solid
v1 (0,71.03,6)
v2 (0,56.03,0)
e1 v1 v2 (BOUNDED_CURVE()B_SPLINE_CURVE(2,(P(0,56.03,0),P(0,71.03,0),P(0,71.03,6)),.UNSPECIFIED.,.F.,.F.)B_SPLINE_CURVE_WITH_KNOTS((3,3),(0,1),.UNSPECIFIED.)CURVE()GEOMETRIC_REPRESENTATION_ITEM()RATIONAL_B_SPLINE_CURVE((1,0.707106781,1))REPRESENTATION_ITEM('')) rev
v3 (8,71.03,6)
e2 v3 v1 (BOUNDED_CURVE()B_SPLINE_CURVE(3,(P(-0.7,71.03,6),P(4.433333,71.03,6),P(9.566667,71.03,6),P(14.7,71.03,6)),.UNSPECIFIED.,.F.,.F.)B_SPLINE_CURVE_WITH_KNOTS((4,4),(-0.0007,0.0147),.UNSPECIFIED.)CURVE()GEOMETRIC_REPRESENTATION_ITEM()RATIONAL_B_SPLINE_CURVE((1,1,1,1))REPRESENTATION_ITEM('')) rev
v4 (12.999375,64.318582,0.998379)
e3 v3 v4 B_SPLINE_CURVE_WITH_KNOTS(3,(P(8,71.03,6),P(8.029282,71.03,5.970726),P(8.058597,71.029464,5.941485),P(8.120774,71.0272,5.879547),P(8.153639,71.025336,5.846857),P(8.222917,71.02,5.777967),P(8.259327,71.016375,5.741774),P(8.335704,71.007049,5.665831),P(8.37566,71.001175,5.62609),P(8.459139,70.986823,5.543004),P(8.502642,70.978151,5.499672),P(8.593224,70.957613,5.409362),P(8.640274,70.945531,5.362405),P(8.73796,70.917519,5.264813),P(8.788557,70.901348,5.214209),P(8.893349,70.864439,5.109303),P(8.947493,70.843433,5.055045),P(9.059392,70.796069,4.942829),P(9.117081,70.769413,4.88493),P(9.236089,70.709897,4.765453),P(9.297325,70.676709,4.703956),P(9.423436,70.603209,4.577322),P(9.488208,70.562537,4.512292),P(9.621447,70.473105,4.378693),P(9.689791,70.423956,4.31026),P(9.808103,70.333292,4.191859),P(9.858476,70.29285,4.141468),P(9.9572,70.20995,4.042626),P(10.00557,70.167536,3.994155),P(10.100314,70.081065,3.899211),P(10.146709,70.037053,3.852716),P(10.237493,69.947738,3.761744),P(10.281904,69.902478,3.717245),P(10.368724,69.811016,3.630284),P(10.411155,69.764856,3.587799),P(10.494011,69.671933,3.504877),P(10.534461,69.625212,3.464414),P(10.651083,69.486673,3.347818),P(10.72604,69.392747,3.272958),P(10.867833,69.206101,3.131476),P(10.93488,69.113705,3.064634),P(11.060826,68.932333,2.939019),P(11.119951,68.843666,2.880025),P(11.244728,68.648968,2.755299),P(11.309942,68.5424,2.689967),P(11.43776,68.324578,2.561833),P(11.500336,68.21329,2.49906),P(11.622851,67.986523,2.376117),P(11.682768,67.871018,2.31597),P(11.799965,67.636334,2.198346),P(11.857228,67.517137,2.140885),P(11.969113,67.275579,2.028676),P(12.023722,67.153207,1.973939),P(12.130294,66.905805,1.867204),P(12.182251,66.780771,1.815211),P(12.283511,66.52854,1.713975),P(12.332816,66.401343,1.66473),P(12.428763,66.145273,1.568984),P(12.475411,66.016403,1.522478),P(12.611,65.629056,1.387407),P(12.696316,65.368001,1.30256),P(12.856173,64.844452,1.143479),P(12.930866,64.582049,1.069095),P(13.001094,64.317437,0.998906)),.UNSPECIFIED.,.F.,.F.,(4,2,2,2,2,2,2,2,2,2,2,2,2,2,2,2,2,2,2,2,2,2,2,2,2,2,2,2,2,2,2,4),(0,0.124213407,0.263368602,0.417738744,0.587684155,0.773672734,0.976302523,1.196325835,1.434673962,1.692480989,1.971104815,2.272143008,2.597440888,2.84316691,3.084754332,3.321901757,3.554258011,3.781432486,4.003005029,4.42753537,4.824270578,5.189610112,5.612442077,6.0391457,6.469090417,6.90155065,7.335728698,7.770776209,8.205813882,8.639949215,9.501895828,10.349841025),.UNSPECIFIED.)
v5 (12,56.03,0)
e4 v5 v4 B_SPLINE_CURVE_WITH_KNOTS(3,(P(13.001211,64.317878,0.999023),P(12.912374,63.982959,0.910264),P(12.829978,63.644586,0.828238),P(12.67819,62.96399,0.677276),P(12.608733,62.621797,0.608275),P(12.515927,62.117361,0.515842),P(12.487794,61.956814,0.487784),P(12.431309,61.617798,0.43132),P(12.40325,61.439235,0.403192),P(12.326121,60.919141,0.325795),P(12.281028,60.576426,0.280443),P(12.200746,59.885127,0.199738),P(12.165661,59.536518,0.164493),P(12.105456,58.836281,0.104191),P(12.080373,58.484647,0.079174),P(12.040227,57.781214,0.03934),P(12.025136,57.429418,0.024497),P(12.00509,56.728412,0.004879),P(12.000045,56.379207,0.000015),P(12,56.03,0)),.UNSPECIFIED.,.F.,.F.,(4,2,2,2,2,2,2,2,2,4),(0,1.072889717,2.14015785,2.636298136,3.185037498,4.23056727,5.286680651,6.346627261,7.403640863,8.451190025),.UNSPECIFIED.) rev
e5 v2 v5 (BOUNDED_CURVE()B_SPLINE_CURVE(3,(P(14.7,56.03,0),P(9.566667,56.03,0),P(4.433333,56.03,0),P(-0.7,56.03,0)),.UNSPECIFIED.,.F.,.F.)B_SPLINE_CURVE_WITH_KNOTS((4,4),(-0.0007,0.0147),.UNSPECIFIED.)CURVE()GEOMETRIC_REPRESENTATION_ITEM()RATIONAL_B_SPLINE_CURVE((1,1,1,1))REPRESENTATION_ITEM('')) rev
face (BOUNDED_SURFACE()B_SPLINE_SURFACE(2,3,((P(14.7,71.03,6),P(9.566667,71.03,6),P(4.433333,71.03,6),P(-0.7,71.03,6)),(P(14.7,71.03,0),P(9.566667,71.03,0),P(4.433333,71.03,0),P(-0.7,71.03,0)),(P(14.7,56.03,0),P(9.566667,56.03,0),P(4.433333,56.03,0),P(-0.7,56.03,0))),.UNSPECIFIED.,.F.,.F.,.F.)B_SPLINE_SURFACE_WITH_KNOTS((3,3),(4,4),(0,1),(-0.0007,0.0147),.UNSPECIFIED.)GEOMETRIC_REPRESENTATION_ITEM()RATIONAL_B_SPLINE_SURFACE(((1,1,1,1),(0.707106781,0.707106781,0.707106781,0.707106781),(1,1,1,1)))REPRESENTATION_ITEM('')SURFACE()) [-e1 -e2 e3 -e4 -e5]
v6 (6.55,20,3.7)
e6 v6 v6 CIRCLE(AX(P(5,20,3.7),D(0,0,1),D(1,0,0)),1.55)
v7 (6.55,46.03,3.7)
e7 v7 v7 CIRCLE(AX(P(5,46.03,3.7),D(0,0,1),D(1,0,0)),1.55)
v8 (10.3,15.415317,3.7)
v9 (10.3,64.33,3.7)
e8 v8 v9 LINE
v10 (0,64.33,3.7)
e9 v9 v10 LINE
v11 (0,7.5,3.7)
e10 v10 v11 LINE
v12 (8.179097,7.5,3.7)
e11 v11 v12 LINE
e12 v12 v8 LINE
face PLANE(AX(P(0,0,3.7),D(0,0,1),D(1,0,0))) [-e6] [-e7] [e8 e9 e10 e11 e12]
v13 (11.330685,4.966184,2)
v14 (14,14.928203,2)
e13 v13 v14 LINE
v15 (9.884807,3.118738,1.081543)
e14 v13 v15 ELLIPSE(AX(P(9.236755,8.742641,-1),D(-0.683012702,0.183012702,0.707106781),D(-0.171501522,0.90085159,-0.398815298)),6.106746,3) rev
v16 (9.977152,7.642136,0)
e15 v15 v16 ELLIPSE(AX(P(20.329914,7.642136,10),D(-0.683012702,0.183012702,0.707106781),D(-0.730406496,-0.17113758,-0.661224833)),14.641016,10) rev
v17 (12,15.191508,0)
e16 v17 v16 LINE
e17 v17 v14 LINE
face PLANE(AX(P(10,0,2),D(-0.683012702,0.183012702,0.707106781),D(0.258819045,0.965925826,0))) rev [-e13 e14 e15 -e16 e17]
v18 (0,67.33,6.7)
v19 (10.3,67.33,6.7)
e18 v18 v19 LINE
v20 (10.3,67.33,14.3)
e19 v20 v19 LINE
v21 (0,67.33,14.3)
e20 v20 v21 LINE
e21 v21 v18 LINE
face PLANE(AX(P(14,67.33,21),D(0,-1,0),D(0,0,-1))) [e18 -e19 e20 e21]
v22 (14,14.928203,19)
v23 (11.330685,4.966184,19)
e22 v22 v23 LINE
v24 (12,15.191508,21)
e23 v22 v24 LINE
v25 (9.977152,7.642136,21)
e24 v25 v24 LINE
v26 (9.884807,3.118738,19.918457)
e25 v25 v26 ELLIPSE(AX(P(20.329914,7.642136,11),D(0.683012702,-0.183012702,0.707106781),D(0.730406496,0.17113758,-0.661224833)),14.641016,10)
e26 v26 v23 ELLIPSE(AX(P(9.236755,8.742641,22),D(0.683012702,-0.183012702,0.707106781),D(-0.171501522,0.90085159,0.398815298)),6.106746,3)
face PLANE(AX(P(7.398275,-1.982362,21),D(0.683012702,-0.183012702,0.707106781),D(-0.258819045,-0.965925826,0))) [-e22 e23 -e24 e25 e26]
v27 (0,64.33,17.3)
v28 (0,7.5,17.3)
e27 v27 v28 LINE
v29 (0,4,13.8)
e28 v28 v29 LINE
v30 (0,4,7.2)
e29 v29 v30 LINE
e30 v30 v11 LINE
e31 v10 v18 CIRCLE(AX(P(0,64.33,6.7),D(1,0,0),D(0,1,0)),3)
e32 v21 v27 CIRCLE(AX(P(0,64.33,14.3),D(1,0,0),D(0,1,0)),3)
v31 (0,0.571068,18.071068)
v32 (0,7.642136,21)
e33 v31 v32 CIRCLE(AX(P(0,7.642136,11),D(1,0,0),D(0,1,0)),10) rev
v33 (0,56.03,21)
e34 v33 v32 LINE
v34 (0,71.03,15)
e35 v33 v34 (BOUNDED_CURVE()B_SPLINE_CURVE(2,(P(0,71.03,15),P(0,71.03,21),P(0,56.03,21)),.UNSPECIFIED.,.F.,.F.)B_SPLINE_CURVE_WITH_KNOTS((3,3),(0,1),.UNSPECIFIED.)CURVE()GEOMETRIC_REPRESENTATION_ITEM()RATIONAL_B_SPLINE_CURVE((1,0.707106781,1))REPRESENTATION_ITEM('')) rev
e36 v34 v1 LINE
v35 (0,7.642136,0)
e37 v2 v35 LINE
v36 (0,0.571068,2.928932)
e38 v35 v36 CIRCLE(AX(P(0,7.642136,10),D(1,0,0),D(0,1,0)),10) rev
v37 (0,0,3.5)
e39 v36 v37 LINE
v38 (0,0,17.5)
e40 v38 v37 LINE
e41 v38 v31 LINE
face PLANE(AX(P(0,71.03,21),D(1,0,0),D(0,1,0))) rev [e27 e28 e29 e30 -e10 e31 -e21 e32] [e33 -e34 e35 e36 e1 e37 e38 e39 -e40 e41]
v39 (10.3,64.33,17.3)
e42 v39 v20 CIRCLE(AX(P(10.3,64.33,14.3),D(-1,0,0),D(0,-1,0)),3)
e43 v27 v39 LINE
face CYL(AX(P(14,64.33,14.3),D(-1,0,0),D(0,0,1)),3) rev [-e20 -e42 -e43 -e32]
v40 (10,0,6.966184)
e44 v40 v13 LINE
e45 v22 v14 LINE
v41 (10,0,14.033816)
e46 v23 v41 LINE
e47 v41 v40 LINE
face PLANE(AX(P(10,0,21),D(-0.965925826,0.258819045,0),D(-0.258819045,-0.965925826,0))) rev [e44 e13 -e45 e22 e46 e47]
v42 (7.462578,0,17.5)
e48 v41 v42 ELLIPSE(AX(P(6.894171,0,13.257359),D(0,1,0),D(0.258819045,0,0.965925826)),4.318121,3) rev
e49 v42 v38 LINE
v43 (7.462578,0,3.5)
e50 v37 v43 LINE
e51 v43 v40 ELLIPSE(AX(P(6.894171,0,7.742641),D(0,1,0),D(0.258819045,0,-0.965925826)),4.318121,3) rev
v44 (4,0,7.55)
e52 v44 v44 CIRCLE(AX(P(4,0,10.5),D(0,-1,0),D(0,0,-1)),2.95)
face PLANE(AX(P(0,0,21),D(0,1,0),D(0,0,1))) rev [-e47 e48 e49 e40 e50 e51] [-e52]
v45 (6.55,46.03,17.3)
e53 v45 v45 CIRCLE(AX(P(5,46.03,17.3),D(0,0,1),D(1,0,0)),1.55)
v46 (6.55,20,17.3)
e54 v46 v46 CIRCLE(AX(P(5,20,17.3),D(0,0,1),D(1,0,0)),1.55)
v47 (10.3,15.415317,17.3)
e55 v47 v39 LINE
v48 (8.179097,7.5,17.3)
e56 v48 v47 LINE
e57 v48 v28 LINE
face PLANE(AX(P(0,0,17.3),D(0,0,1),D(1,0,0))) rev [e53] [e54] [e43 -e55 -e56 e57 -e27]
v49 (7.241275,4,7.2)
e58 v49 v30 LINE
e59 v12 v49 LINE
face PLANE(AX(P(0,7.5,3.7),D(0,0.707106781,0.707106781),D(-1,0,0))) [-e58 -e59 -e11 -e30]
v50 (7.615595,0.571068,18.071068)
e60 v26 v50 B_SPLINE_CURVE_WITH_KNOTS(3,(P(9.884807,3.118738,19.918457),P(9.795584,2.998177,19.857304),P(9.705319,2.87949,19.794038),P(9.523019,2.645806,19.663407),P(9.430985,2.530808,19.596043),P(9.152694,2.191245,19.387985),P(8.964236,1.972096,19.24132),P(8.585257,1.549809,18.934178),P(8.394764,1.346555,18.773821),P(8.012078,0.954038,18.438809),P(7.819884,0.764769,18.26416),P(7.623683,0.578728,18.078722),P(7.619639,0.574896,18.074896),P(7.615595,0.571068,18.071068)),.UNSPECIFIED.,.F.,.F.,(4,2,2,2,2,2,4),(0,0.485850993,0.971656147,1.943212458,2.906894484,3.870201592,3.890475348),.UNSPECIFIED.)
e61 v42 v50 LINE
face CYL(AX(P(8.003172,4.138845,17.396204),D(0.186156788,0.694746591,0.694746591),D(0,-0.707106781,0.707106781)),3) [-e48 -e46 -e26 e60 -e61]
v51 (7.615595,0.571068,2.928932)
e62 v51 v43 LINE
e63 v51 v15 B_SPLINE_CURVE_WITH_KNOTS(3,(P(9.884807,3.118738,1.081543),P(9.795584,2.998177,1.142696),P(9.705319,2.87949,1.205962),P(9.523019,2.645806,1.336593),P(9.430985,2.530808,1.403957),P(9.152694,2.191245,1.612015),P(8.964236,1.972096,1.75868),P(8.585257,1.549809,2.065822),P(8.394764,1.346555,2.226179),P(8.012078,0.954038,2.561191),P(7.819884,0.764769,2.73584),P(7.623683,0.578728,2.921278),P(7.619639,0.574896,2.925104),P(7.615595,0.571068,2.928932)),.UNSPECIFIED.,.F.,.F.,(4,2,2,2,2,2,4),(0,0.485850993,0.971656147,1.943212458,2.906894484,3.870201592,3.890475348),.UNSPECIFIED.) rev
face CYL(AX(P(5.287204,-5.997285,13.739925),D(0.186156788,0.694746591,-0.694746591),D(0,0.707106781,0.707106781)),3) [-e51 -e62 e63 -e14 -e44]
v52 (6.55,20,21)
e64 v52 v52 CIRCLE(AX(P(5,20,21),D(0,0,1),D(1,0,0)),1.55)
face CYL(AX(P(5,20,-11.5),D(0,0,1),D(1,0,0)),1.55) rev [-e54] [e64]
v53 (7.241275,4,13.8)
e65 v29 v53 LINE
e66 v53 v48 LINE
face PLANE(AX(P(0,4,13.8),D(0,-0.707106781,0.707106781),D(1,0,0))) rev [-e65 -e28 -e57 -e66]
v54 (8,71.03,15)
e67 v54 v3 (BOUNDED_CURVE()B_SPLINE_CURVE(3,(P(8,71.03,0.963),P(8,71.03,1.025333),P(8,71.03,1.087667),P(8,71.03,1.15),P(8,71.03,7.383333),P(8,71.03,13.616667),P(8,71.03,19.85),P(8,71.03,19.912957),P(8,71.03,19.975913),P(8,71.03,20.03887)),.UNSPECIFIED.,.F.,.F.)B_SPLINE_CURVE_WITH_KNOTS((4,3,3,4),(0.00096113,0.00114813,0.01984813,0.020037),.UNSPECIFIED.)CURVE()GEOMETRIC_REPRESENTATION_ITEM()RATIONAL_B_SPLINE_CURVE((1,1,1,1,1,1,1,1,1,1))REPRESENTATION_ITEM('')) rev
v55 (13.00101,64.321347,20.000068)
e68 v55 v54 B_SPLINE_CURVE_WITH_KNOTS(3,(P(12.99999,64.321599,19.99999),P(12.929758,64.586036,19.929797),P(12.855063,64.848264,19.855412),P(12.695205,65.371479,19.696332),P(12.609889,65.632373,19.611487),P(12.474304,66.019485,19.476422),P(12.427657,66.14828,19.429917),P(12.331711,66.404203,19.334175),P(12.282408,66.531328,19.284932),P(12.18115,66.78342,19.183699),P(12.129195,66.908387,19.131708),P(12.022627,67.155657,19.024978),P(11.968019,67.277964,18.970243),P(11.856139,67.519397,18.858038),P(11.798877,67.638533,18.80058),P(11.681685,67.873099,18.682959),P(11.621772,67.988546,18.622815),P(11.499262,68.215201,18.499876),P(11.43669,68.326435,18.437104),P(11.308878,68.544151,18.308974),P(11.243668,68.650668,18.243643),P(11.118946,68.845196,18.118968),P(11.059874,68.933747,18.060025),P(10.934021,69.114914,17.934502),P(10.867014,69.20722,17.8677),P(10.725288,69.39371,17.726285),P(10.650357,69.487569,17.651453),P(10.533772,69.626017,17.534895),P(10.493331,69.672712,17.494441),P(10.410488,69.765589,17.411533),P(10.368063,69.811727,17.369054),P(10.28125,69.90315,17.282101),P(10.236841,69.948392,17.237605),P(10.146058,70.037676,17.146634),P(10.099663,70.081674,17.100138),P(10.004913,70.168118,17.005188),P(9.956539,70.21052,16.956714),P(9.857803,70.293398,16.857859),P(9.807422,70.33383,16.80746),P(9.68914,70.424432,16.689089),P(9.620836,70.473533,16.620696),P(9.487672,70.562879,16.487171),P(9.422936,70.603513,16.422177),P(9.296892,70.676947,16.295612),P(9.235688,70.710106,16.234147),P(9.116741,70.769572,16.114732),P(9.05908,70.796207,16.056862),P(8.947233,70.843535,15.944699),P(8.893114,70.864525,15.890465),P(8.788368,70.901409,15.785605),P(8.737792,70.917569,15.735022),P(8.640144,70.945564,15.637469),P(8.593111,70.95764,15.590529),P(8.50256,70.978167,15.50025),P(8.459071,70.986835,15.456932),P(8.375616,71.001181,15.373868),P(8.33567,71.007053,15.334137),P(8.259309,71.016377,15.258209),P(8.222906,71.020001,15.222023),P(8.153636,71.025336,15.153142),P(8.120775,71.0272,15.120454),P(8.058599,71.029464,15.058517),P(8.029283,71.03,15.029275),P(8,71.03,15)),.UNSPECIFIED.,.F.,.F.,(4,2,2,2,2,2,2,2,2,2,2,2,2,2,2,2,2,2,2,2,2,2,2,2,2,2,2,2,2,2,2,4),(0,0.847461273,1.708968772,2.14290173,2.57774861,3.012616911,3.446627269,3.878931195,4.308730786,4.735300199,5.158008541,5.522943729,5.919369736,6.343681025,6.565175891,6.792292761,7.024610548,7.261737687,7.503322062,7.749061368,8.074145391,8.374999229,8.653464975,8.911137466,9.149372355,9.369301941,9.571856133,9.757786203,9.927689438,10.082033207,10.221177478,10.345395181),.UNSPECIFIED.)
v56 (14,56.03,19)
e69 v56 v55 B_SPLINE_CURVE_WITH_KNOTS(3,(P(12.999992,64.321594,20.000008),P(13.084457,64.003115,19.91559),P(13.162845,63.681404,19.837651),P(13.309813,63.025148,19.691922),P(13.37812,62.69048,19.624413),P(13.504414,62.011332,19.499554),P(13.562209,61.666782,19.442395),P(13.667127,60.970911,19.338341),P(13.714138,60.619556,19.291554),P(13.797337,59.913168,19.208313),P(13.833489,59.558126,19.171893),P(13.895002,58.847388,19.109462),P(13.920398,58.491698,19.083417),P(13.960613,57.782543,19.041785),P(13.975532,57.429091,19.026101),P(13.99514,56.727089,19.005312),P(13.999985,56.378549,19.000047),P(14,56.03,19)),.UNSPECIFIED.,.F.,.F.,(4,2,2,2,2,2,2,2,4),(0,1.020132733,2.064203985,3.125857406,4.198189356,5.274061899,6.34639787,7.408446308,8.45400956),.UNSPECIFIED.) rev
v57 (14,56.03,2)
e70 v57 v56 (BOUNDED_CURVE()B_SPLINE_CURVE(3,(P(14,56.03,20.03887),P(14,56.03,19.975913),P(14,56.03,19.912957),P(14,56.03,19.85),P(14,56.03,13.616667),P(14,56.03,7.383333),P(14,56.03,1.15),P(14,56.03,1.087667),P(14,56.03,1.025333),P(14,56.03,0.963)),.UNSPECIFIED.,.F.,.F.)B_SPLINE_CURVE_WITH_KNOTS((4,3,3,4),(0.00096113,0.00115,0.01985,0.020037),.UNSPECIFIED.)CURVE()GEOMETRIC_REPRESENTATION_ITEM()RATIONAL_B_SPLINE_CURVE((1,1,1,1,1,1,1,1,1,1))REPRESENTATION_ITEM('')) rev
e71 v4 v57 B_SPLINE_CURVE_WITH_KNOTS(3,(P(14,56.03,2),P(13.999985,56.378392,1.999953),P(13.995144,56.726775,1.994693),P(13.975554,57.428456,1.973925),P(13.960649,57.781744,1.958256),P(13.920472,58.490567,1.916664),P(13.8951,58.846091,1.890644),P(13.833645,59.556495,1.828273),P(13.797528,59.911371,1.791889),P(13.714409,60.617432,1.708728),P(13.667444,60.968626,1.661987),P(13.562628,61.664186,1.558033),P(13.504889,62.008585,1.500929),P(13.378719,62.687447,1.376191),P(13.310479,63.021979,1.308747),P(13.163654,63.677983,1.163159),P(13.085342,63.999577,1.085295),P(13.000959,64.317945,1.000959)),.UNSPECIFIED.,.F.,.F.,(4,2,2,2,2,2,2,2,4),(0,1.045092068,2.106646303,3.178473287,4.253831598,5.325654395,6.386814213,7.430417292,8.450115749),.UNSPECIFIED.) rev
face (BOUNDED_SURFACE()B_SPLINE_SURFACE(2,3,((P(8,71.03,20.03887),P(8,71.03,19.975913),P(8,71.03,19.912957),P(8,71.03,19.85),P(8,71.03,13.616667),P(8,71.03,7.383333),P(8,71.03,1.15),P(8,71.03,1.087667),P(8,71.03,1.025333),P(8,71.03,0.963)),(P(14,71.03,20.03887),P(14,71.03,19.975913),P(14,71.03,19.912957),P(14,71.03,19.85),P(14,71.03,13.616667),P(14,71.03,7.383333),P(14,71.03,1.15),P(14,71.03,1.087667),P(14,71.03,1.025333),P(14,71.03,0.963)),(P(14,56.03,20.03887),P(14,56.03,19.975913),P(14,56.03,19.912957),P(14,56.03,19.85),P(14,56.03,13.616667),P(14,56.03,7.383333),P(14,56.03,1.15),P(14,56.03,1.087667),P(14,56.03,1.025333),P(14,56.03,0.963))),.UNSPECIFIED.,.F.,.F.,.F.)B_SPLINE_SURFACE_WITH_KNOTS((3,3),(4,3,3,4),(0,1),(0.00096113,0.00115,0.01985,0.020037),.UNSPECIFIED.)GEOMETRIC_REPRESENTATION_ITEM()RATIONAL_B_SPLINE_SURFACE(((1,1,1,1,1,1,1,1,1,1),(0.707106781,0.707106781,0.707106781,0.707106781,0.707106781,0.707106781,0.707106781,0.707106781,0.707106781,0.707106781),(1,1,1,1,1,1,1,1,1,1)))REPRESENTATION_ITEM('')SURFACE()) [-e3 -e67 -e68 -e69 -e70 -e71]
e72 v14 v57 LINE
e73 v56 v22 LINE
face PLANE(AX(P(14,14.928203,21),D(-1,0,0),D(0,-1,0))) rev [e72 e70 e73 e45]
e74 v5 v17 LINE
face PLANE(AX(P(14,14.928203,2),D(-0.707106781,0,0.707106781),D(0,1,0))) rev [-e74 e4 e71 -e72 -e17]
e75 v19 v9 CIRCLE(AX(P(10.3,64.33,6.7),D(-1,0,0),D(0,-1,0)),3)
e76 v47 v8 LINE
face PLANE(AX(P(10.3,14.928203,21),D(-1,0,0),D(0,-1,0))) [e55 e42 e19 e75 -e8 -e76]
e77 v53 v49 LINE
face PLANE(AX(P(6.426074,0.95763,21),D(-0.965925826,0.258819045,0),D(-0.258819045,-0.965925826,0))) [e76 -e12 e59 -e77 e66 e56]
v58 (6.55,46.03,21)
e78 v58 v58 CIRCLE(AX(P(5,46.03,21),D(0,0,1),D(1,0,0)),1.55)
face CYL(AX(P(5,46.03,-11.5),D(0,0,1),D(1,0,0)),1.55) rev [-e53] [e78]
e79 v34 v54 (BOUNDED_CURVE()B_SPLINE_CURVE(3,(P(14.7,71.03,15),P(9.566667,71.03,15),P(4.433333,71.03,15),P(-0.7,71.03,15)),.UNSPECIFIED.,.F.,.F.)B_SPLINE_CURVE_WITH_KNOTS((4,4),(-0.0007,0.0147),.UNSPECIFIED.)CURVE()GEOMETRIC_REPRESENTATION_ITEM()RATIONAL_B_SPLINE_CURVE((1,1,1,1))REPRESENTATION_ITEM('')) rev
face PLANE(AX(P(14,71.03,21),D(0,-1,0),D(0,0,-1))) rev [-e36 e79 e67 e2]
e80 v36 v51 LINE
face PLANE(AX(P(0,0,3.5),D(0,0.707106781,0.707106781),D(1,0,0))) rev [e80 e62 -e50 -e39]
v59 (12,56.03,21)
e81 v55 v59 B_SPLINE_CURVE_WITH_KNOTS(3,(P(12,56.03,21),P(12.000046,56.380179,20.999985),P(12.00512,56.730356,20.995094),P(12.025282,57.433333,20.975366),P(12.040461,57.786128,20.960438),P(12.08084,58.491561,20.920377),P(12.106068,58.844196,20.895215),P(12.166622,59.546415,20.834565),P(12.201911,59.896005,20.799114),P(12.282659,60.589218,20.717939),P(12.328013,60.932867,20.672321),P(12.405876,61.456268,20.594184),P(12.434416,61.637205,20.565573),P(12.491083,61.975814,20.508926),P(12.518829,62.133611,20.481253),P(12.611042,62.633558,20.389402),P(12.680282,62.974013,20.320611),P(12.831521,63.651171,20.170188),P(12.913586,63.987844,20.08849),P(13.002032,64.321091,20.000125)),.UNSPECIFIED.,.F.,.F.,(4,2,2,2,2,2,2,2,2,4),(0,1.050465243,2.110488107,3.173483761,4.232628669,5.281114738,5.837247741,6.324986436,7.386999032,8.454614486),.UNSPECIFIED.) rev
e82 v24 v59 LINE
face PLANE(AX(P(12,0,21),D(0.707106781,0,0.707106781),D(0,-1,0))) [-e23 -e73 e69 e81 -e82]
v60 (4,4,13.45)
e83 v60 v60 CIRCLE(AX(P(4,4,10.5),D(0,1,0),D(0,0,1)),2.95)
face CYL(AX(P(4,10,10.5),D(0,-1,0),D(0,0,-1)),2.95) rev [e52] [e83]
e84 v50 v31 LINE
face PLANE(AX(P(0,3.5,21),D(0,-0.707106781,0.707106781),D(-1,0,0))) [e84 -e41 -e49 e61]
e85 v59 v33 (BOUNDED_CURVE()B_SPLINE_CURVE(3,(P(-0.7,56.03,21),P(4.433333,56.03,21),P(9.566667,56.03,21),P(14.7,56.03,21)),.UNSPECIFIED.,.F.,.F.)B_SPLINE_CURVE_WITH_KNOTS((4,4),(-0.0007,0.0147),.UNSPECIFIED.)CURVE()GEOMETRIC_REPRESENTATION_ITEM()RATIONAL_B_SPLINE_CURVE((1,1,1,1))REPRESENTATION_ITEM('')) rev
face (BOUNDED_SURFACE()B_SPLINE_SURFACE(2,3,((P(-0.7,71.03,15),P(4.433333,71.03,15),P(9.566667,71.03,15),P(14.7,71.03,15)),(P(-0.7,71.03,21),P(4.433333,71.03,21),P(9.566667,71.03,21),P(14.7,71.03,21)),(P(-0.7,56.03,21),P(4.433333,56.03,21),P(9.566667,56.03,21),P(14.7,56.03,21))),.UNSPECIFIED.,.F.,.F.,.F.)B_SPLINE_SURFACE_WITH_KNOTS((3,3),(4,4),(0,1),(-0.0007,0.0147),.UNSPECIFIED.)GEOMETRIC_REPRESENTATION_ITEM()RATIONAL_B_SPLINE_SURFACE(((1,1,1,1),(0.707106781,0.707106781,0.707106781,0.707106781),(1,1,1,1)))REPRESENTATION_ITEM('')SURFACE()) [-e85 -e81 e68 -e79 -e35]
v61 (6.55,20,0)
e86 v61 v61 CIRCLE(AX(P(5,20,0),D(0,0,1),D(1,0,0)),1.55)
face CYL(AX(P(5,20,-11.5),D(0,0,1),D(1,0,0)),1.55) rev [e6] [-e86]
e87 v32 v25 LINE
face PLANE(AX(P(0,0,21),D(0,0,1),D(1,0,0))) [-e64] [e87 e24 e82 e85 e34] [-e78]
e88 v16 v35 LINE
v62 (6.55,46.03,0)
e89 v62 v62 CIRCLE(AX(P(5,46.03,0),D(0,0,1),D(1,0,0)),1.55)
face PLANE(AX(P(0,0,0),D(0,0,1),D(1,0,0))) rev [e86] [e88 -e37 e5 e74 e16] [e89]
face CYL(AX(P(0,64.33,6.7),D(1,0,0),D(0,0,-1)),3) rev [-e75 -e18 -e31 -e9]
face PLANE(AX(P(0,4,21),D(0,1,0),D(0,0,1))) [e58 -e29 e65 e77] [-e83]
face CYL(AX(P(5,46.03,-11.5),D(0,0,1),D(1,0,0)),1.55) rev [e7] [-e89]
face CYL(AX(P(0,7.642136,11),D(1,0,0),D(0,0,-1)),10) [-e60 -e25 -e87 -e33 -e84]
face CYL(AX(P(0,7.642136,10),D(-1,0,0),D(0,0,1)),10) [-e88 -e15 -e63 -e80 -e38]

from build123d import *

# Parameters (mm, degrees)
BOSS_EXTRU_1_DEPTH      = 21
COQUE1_START            = 3.7
COQUE1_DEPTH            = 13.6
ESQUISSE2_R             = 1.55
ENL_V_MAT_EXTRU_1_DEPTH = 32.5
ESQUISSE3_R             = 2.95
ENL_V_MAT_EXTRU_2_DEPTH = 10
CHANFREIN4_SIZE         = 3.5
CHANFREIN1_SIZE         = 2
CONG_1_R                = 3
CONG_2_DEPTH            = 11.330684872
CONG_3_SIZE             = 15
CONG_3_SIZE_2           = 6
CONG_4_SIZE             = 15
CONG_4_SIZE_2           = 6
CONG_5_SIZE             = 6
CONG_5_SIZE_2           = 15
CONG_6_R                = 3


with BuildPart() as part:
    # Esquisse1 → Boss.-Extru.1 (new body)
    with BuildSketch(Plane.XY):
        Polygon((0, 0), (10, 0), (14, 14.92820323), (14, 71.03), (0, 71.03), align=None)
    extrude(amount=BOSS_EXTRU_1_DEPTH)

    # Coque1: read off the stored shape, not the designer's step
    # Coque1 outline → Coque1 (cut)
    with BuildSketch(Plane.XY.offset(COQUE1_START)):
        Polygon((0, 4), (7.241274902, 4), (10.3, 15.415317471), (10.3, 67.33), (0, 67.33), align=None)
    extrude(amount=COQUE1_DEPTH, mode=Mode.SUBTRACT)

    # Esquisse2 → Enlèv. mat.-Extru.1 (cut)
    with BuildSketch(Plane.XY.offset(21)):
        with Locations((5, 46.03)):
            Circle(ESQUISSE2_R)
        with Locations((5, 20)):
            Circle(ESQUISSE2_R)
    extrude(amount=-ENL_V_MAT_EXTRU_1_DEPTH, mode=Mode.SUBTRACT)

    # Esquisse3 → Enlèv. mat.-Extru.2 (cut)
    with BuildSketch(Plane.XZ):
        with Locations(Location((4, 10.5, 0), (0, 0, 270))):
            Circle(ESQUISSE3_R)
    extrude(amount=-ENL_V_MAT_EXTRU_2_DEPTH, mode=Mode.SUBTRACT)

    # Chanfrein4
    chanfrein4_edges = [part.edges().sort_by_distance(p)[0] for p in [
        (3.620637451, 4, 3.7),
        (3.620637451, 4, 17.3),
        (5, 0, 0),
        (5, 0, 21),
    ]]
    chamfer(chanfrein4_edges, length=CHANFREIN4_SIZE)

    # Chanfrein1
    chanfrein1_edges = [part.edges().sort_by_distance(p)[0] for p in [
        (14, 42.979101615, 21),
        (14, 42.979101615, 0),
        (12.468911087, 9.214101615, 0),
        (12.468911087, 9.214101615, 21),
    ]]
    chamfer(chanfrein1_edges, length=CHANFREIN1_SIZE)

    # Congé1
    cong_1_edges = [part.edges().sort_by_distance(p)[0] for p in [
        (10.200961894, 0.75, 2.75),
        (10.200961894, 0.75, 18.25),
    ]]
    fillet(cong_1_edges, radius=CONG_1_R)

    # Congé2: read off the stored shape, not the designer's step
    # Congé2 outline → Congé2 (cut)
    with BuildSketch(Plane.YZ):
        with BuildLine():
            Line((3.5, 0), (7.642135624, 0))
            ThreePointArc((7.642135624, 0), (3.8153013, 0.761204675), (0.571067812, 2.928932188))
            Line((0.571067812, 2.928932188), (3.5, 0))
        make_face()
        with BuildLine():
            ThreePointArc((0.571067812, 18.071067812), (3.8153013, 20.238795325), (7.642135624, 21))
            Line((7.642135624, 21), (3.5, 21))
            Line((3.5, 21), (0.571067812, 18.071067812))
        make_face()
    extrude(amount=CONG_2_DEPTH, mode=Mode.SUBTRACT)

    # Congé3
    # a fillet whose section is not a circle: 15, 6 mm, written as the material it takes off along each edge
    with BuildSketch(Plane(origin=(49.5, 71.03, 21), x_dir=(0, -1, 0), z_dir=(-1, 0, 0))) as cong_3_piece_1:
        with BuildLine():
            Bezier((CONG_3_SIZE, 0), (0, 0), (0, -CONG_3_SIZE_2), weights=[1, 0.707106781, 1])
            Line((0, -CONG_3_SIZE_2), (0, 0))
            Line((0, 0), (CONG_3_SIZE, 0))
        make_face()
    extrude(amount=87, mode=Mode.SUBTRACT)

    # Congé4
    # a fillet whose section is not a circle: 15, 6 mm, written as the material it takes off along each edge
    with BuildSketch(Plane(origin=(49.5, 71.03, 0), x_dir=(0, -1, 0), z_dir=(-1, 0, 0))) as cong_4_piece_1:
        with BuildLine():
            Bezier((CONG_4_SIZE, 0), (0, 0), (0, CONG_4_SIZE_2), weights=[1, 0.707106781, 1])
            Line((0, CONG_4_SIZE_2), (0, 0))
            Line((0, 0), (CONG_4_SIZE, 0))
        make_face()
    extrude(amount=87, mode=Mode.SUBTRACT)

    # Congé5
    # a fillet whose section is not a circle: 15, 6 mm, written as the material it takes off along each edge
    with BuildSketch(Plane(origin=(14, 71.03, -31.5), x_dir=(-1, 0, 0), z_dir=(0, 0, 1))) as cong_5_piece_1:
        with BuildLine():
            Bezier((CONG_5_SIZE, 0), (0, 0), (0, CONG_5_SIZE_2), weights=[1, 0.707106781, 1])
            Line((0, CONG_5_SIZE_2), (0, 0))
            Line((0, 0), (CONG_5_SIZE, 0))
        make_face()
    extrude(amount=84, mode=Mode.SUBTRACT)

    # Congé6
    cong_6_edges = [part.edges().sort_by_distance(p)[0] for p in [
        (5.15, 67.33, 3.7),
        (5.15, 67.33, 17.3),
    ]]
    fillet(cong_6_edges, radius=CONG_6_R)


solid = part.part
